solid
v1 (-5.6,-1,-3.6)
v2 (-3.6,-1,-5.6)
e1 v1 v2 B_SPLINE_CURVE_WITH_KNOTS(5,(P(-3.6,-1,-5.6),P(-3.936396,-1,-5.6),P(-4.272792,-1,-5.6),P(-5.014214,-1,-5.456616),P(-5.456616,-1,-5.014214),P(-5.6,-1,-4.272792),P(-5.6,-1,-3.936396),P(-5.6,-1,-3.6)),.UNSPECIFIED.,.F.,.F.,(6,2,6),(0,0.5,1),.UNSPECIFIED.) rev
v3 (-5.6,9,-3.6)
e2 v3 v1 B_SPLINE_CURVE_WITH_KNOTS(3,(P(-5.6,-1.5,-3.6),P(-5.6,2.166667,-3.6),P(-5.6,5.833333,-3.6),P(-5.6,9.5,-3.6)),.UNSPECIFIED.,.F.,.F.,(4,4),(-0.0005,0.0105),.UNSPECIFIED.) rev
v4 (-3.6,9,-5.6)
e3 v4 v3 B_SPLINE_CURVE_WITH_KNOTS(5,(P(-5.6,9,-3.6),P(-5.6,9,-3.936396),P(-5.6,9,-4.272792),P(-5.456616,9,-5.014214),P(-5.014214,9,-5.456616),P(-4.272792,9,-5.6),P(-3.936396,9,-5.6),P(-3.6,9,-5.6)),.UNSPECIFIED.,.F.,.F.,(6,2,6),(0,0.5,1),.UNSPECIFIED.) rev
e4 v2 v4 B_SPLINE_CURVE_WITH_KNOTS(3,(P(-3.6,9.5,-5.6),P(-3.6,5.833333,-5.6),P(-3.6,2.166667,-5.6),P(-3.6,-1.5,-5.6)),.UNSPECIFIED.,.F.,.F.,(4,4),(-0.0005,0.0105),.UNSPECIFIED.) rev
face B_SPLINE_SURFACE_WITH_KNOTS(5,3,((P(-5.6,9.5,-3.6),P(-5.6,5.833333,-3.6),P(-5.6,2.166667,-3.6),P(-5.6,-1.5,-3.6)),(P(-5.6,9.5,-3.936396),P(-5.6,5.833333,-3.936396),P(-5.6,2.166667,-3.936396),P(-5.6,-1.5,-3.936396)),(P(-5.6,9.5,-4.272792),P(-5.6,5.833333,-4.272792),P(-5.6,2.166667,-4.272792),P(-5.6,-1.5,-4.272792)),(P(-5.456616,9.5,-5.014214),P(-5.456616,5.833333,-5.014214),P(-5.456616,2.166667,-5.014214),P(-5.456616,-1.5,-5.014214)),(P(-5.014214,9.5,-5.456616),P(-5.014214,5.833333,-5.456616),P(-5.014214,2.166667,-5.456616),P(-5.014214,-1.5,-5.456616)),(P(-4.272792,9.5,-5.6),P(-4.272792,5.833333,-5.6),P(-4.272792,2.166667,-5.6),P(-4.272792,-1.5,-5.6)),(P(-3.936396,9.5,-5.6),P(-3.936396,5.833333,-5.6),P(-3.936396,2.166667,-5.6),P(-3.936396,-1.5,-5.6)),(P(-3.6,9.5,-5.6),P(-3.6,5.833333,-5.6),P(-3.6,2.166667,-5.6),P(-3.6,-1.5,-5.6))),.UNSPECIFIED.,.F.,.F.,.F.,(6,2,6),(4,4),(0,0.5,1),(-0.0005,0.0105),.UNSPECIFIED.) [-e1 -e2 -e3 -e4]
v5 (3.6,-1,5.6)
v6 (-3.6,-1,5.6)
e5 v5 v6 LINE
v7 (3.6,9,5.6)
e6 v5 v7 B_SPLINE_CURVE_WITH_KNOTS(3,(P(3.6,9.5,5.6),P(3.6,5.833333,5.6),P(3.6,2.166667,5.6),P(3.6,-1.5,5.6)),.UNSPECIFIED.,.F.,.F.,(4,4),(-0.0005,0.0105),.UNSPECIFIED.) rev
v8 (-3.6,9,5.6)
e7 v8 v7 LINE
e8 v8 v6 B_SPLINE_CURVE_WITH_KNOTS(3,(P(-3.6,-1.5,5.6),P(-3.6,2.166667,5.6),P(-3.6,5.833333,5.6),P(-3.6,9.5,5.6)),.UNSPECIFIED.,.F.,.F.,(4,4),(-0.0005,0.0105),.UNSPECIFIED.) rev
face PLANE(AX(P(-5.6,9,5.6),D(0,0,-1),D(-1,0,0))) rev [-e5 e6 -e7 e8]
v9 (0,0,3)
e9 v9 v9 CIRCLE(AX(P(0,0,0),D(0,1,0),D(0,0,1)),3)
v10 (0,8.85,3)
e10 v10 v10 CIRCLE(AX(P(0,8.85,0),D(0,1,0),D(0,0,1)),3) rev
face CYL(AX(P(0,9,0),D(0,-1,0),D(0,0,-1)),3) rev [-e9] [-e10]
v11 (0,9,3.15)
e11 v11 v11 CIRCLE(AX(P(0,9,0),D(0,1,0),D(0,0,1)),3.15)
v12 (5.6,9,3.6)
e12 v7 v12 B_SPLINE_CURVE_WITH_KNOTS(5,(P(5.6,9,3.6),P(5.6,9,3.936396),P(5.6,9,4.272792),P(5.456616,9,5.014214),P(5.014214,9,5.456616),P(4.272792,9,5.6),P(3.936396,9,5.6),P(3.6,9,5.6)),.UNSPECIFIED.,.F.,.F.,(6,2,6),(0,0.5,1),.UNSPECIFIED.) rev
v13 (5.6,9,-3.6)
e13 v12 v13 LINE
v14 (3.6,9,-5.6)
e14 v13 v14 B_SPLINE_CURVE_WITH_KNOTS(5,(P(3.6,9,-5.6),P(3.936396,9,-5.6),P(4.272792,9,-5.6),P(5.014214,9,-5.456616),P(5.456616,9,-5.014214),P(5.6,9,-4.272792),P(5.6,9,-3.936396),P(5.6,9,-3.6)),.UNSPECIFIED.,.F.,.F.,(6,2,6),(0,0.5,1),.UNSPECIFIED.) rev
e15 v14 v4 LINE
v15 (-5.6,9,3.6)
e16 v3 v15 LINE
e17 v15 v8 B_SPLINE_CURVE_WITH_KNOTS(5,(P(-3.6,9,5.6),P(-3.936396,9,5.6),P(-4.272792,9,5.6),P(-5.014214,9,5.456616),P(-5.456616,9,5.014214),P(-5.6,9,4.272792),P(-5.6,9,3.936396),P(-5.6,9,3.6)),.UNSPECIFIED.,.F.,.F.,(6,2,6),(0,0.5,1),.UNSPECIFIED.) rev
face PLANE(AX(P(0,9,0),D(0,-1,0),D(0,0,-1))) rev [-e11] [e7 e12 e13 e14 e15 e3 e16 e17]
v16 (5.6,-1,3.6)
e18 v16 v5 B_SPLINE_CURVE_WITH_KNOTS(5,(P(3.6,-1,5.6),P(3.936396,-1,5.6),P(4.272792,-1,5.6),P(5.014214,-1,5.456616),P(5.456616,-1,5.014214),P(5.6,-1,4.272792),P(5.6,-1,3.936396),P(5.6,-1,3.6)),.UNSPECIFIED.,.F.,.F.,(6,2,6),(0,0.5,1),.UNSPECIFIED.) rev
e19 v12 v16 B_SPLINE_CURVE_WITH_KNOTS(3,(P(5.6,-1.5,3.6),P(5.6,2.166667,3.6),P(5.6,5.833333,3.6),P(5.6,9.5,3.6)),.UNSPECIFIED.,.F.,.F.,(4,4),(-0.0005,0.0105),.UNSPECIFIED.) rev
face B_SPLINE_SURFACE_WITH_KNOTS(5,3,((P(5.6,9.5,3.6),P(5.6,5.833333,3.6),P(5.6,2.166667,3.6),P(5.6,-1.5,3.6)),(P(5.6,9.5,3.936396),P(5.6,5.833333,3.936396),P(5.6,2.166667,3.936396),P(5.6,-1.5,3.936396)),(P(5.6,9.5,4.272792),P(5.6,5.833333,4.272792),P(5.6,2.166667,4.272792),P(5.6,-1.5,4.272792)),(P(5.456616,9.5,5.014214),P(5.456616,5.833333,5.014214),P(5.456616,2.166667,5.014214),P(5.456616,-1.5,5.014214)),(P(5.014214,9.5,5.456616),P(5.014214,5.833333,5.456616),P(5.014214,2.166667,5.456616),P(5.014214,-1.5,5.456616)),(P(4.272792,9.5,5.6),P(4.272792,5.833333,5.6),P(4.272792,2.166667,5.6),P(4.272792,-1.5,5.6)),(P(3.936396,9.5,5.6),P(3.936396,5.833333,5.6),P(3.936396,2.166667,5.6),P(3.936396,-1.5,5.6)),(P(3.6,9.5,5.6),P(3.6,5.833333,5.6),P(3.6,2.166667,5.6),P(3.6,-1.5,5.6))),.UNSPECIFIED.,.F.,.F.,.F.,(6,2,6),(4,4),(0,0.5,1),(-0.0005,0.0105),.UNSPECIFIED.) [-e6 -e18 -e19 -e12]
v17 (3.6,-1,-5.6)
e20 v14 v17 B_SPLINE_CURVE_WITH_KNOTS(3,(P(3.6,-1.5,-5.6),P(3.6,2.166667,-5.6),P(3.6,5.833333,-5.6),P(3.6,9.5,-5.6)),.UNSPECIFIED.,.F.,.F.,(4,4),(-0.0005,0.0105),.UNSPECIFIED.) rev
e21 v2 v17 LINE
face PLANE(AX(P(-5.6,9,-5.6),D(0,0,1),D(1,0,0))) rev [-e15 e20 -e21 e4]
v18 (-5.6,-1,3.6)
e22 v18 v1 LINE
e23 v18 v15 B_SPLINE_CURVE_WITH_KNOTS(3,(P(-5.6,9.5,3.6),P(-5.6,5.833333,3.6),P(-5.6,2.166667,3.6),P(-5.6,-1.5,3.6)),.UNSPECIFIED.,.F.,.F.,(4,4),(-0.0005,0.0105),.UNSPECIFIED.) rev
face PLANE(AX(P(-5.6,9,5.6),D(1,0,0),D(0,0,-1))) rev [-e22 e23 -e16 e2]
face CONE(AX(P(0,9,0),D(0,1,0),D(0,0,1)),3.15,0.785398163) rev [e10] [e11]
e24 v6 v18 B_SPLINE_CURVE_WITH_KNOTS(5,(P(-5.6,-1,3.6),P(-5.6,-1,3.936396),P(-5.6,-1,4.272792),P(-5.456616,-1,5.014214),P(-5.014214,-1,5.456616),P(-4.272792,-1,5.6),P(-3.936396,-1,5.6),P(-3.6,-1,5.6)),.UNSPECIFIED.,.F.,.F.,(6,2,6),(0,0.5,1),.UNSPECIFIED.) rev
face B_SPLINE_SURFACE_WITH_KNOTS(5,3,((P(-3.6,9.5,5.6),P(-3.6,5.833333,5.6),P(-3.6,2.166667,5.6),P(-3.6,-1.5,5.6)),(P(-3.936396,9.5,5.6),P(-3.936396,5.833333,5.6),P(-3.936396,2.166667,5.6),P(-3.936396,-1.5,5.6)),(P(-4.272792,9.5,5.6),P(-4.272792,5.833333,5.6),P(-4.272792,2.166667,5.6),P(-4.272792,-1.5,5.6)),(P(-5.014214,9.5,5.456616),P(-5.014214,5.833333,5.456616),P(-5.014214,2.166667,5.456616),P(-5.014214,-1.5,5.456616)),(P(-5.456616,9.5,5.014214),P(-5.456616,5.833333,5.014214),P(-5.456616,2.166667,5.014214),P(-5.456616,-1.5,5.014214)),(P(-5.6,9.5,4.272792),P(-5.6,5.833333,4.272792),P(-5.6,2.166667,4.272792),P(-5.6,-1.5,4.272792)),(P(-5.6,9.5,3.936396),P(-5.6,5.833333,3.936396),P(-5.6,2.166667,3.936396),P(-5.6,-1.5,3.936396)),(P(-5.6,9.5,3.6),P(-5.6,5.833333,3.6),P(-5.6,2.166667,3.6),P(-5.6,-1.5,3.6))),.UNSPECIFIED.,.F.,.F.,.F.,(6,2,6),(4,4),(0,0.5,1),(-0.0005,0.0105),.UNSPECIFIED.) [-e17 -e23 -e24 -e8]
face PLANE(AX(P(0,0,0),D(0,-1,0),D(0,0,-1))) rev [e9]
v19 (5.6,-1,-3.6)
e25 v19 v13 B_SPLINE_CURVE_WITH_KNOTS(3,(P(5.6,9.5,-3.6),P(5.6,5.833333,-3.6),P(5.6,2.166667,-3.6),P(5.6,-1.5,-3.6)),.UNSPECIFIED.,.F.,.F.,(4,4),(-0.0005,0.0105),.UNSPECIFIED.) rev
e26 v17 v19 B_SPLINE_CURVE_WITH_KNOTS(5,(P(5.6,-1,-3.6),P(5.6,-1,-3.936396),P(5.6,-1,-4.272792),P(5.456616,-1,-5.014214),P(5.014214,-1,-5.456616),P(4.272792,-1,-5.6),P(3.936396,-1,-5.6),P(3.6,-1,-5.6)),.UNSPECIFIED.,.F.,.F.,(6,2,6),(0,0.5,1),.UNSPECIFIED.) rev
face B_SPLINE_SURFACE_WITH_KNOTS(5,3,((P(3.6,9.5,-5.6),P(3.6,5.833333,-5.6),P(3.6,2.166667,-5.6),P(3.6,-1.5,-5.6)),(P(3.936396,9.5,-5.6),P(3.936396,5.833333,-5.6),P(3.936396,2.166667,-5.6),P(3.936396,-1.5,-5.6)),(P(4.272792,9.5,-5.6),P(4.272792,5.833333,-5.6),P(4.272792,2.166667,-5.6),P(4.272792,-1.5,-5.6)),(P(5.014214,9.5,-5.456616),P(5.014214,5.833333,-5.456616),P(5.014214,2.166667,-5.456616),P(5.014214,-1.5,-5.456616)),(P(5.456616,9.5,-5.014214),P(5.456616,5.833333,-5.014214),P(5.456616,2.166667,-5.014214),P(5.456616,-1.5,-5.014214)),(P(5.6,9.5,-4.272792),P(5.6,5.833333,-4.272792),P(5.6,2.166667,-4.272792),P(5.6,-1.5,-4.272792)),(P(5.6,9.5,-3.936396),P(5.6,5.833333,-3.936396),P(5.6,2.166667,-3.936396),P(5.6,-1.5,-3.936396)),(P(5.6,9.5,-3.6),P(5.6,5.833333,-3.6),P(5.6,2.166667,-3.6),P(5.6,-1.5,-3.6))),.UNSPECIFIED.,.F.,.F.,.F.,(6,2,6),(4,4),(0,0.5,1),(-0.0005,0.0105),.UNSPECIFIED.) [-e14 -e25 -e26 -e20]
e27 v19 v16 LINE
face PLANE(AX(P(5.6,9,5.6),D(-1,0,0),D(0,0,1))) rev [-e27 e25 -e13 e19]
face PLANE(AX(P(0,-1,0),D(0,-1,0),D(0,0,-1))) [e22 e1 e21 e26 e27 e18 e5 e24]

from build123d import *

# Parameters (mm, degrees)
SKETCH2_W                                       = 11.2
SKETCH2_H                                       = 11.2
SKETCH2_R                                       = 3
BOSS_EXTRUDE1_DEPTH                             = 9
SKETCH3_W                                       = 11.2
SKETCH3_H                                       = 11.2
BOSS_EXTRUDE2_DEPTH                             = 1
FILLET1_SIZE                                    = 2
CSK_FOR_M3_FLAT_HEAD_MACHINE_SCREW1_D           = 3.4
CSK_FOR_M3_FLAT_HEAD_MACHINE_SCREW1_DEPTH       = 9
CSK_FOR_M3_FLAT_HEAD_MACHINE_SCREW1_CSINK_D     = 6.3
CSK_FOR_M3_FLAT_HEAD_MACHINE_SCREW1_CSINK_ANGLE = 90


with BuildPart() as part:
    # Sketch2 → Boss-Extrude1 (new body)
    with BuildSketch(Plane(origin=(0, 0, 0), x_dir=(1, 0, 0), z_dir=(0, 1, 0))):
        Rectangle(SKETCH2_W, SKETCH2_H)
        with Locations(Location((0, 0, 0), (0, 0, 270))):
            Circle(SKETCH2_R, mode=Mode.SUBTRACT)
    extrude(amount=BOSS_EXTRUDE1_DEPTH)

    # Sketch3 → Boss-Extrude2 (add)
    with BuildSketch(Plane.XZ):
        Rectangle(SKETCH3_W, SKETCH3_H)
    extrude(amount=BOSS_EXTRUDE2_DEPTH)

    # Fillet1
    # a fillet whose section is not a circle: 2 mm, written as the material it takes off along each edge
    with BuildSketch(Plane(origin=(5.6, -6, 5.6), x_dir=(-1, 0, 0), z_dir=(0, 1, 0)), Plane(origin=(-5.6, 14, 5.6), x_dir=(1, 0, 0), z_dir=(0, -1, 0))) as fillet1_piece_1:
        with BuildLine():
            add(Edge.make_bspline([(FILLET1_SIZE, 0), (FILLET1_SIZE * 0.831801948466, 0), (FILLET1_SIZE * 0.663603896932, 0), (FILLET1_SIZE * 0.292893218813, -FILLET1_SIZE * 0.0716919198361), (FILLET1_SIZE * 0.0716919198361, -FILLET1_SIZE * 0.292893218813), (0, -FILLET1_SIZE * 0.663603896932), (0, -FILLET1_SIZE * 0.831801948466), (0, -FILLET1_SIZE)], knots=[0, 0, 0, 0, 0, 0, 0.5, 0.5, 1, 1, 1, 1, 1, 1], degree=5))
            Line((0, -FILLET1_SIZE), (0, 0))
            Line((0, 0), (FILLET1_SIZE, 0))
        make_face()
    extrude(amount=20, mode=Mode.SUBTRACT)
    with BuildSketch(Plane(origin=(-5.6, 14, -5.6), x_dir=(1, 0, 0), z_dir=(0, -1, 0)), Plane(origin=(5.6, -6, -5.6), x_dir=(-1, 0, 0), z_dir=(0, 1, 0))) as fillet1_piece_2:
        with BuildLine():
            add(Edge.make_bspline([(FILLET1_SIZE, 0), (FILLET1_SIZE * 0.831801948466, 0), (FILLET1_SIZE * 0.663603896932, 0), (FILLET1_SIZE * 0.292893218813, FILLET1_SIZE * 0.0716919198361), (FILLET1_SIZE * 0.0716919198361, FILLET1_SIZE * 0.292893218813), (0, FILLET1_SIZE * 0.663603896932), (0, FILLET1_SIZE * 0.831801948466), (0, FILLET1_SIZE)], knots=[0, 0, 0, 0, 0, 0, 0.5, 0.5, 1, 1, 1, 1, 1, 1], degree=5))
            Line((0, FILLET1_SIZE), (0, 0))
            Line((0, 0), (FILLET1_SIZE, 0))
        make_face()
    extrude(amount=20, mode=Mode.SUBTRACT)

    # CSK for M3 Flat Head Machine Screw1
    with Locations(Plane(origin=(0, 9, 0), x_dir=(1, 0, 0), z_dir=(0, 1, 0))):
        with Locations((0, 0)):
            CounterSinkHole(CSK_FOR_M3_FLAT_HEAD_MACHINE_SCREW1_D / 2, CSK_FOR_M3_FLAT_HEAD_MACHINE_SCREW1_CSINK_D / 2, depth=CSK_FOR_M3_FLAT_HEAD_MACHINE_SCREW1_DEPTH, counter_sink_angle=CSK_FOR_M3_FLAT_HEAD_MACHINE_SCREW1_CSINK_ANGLE)


solid = part.part
